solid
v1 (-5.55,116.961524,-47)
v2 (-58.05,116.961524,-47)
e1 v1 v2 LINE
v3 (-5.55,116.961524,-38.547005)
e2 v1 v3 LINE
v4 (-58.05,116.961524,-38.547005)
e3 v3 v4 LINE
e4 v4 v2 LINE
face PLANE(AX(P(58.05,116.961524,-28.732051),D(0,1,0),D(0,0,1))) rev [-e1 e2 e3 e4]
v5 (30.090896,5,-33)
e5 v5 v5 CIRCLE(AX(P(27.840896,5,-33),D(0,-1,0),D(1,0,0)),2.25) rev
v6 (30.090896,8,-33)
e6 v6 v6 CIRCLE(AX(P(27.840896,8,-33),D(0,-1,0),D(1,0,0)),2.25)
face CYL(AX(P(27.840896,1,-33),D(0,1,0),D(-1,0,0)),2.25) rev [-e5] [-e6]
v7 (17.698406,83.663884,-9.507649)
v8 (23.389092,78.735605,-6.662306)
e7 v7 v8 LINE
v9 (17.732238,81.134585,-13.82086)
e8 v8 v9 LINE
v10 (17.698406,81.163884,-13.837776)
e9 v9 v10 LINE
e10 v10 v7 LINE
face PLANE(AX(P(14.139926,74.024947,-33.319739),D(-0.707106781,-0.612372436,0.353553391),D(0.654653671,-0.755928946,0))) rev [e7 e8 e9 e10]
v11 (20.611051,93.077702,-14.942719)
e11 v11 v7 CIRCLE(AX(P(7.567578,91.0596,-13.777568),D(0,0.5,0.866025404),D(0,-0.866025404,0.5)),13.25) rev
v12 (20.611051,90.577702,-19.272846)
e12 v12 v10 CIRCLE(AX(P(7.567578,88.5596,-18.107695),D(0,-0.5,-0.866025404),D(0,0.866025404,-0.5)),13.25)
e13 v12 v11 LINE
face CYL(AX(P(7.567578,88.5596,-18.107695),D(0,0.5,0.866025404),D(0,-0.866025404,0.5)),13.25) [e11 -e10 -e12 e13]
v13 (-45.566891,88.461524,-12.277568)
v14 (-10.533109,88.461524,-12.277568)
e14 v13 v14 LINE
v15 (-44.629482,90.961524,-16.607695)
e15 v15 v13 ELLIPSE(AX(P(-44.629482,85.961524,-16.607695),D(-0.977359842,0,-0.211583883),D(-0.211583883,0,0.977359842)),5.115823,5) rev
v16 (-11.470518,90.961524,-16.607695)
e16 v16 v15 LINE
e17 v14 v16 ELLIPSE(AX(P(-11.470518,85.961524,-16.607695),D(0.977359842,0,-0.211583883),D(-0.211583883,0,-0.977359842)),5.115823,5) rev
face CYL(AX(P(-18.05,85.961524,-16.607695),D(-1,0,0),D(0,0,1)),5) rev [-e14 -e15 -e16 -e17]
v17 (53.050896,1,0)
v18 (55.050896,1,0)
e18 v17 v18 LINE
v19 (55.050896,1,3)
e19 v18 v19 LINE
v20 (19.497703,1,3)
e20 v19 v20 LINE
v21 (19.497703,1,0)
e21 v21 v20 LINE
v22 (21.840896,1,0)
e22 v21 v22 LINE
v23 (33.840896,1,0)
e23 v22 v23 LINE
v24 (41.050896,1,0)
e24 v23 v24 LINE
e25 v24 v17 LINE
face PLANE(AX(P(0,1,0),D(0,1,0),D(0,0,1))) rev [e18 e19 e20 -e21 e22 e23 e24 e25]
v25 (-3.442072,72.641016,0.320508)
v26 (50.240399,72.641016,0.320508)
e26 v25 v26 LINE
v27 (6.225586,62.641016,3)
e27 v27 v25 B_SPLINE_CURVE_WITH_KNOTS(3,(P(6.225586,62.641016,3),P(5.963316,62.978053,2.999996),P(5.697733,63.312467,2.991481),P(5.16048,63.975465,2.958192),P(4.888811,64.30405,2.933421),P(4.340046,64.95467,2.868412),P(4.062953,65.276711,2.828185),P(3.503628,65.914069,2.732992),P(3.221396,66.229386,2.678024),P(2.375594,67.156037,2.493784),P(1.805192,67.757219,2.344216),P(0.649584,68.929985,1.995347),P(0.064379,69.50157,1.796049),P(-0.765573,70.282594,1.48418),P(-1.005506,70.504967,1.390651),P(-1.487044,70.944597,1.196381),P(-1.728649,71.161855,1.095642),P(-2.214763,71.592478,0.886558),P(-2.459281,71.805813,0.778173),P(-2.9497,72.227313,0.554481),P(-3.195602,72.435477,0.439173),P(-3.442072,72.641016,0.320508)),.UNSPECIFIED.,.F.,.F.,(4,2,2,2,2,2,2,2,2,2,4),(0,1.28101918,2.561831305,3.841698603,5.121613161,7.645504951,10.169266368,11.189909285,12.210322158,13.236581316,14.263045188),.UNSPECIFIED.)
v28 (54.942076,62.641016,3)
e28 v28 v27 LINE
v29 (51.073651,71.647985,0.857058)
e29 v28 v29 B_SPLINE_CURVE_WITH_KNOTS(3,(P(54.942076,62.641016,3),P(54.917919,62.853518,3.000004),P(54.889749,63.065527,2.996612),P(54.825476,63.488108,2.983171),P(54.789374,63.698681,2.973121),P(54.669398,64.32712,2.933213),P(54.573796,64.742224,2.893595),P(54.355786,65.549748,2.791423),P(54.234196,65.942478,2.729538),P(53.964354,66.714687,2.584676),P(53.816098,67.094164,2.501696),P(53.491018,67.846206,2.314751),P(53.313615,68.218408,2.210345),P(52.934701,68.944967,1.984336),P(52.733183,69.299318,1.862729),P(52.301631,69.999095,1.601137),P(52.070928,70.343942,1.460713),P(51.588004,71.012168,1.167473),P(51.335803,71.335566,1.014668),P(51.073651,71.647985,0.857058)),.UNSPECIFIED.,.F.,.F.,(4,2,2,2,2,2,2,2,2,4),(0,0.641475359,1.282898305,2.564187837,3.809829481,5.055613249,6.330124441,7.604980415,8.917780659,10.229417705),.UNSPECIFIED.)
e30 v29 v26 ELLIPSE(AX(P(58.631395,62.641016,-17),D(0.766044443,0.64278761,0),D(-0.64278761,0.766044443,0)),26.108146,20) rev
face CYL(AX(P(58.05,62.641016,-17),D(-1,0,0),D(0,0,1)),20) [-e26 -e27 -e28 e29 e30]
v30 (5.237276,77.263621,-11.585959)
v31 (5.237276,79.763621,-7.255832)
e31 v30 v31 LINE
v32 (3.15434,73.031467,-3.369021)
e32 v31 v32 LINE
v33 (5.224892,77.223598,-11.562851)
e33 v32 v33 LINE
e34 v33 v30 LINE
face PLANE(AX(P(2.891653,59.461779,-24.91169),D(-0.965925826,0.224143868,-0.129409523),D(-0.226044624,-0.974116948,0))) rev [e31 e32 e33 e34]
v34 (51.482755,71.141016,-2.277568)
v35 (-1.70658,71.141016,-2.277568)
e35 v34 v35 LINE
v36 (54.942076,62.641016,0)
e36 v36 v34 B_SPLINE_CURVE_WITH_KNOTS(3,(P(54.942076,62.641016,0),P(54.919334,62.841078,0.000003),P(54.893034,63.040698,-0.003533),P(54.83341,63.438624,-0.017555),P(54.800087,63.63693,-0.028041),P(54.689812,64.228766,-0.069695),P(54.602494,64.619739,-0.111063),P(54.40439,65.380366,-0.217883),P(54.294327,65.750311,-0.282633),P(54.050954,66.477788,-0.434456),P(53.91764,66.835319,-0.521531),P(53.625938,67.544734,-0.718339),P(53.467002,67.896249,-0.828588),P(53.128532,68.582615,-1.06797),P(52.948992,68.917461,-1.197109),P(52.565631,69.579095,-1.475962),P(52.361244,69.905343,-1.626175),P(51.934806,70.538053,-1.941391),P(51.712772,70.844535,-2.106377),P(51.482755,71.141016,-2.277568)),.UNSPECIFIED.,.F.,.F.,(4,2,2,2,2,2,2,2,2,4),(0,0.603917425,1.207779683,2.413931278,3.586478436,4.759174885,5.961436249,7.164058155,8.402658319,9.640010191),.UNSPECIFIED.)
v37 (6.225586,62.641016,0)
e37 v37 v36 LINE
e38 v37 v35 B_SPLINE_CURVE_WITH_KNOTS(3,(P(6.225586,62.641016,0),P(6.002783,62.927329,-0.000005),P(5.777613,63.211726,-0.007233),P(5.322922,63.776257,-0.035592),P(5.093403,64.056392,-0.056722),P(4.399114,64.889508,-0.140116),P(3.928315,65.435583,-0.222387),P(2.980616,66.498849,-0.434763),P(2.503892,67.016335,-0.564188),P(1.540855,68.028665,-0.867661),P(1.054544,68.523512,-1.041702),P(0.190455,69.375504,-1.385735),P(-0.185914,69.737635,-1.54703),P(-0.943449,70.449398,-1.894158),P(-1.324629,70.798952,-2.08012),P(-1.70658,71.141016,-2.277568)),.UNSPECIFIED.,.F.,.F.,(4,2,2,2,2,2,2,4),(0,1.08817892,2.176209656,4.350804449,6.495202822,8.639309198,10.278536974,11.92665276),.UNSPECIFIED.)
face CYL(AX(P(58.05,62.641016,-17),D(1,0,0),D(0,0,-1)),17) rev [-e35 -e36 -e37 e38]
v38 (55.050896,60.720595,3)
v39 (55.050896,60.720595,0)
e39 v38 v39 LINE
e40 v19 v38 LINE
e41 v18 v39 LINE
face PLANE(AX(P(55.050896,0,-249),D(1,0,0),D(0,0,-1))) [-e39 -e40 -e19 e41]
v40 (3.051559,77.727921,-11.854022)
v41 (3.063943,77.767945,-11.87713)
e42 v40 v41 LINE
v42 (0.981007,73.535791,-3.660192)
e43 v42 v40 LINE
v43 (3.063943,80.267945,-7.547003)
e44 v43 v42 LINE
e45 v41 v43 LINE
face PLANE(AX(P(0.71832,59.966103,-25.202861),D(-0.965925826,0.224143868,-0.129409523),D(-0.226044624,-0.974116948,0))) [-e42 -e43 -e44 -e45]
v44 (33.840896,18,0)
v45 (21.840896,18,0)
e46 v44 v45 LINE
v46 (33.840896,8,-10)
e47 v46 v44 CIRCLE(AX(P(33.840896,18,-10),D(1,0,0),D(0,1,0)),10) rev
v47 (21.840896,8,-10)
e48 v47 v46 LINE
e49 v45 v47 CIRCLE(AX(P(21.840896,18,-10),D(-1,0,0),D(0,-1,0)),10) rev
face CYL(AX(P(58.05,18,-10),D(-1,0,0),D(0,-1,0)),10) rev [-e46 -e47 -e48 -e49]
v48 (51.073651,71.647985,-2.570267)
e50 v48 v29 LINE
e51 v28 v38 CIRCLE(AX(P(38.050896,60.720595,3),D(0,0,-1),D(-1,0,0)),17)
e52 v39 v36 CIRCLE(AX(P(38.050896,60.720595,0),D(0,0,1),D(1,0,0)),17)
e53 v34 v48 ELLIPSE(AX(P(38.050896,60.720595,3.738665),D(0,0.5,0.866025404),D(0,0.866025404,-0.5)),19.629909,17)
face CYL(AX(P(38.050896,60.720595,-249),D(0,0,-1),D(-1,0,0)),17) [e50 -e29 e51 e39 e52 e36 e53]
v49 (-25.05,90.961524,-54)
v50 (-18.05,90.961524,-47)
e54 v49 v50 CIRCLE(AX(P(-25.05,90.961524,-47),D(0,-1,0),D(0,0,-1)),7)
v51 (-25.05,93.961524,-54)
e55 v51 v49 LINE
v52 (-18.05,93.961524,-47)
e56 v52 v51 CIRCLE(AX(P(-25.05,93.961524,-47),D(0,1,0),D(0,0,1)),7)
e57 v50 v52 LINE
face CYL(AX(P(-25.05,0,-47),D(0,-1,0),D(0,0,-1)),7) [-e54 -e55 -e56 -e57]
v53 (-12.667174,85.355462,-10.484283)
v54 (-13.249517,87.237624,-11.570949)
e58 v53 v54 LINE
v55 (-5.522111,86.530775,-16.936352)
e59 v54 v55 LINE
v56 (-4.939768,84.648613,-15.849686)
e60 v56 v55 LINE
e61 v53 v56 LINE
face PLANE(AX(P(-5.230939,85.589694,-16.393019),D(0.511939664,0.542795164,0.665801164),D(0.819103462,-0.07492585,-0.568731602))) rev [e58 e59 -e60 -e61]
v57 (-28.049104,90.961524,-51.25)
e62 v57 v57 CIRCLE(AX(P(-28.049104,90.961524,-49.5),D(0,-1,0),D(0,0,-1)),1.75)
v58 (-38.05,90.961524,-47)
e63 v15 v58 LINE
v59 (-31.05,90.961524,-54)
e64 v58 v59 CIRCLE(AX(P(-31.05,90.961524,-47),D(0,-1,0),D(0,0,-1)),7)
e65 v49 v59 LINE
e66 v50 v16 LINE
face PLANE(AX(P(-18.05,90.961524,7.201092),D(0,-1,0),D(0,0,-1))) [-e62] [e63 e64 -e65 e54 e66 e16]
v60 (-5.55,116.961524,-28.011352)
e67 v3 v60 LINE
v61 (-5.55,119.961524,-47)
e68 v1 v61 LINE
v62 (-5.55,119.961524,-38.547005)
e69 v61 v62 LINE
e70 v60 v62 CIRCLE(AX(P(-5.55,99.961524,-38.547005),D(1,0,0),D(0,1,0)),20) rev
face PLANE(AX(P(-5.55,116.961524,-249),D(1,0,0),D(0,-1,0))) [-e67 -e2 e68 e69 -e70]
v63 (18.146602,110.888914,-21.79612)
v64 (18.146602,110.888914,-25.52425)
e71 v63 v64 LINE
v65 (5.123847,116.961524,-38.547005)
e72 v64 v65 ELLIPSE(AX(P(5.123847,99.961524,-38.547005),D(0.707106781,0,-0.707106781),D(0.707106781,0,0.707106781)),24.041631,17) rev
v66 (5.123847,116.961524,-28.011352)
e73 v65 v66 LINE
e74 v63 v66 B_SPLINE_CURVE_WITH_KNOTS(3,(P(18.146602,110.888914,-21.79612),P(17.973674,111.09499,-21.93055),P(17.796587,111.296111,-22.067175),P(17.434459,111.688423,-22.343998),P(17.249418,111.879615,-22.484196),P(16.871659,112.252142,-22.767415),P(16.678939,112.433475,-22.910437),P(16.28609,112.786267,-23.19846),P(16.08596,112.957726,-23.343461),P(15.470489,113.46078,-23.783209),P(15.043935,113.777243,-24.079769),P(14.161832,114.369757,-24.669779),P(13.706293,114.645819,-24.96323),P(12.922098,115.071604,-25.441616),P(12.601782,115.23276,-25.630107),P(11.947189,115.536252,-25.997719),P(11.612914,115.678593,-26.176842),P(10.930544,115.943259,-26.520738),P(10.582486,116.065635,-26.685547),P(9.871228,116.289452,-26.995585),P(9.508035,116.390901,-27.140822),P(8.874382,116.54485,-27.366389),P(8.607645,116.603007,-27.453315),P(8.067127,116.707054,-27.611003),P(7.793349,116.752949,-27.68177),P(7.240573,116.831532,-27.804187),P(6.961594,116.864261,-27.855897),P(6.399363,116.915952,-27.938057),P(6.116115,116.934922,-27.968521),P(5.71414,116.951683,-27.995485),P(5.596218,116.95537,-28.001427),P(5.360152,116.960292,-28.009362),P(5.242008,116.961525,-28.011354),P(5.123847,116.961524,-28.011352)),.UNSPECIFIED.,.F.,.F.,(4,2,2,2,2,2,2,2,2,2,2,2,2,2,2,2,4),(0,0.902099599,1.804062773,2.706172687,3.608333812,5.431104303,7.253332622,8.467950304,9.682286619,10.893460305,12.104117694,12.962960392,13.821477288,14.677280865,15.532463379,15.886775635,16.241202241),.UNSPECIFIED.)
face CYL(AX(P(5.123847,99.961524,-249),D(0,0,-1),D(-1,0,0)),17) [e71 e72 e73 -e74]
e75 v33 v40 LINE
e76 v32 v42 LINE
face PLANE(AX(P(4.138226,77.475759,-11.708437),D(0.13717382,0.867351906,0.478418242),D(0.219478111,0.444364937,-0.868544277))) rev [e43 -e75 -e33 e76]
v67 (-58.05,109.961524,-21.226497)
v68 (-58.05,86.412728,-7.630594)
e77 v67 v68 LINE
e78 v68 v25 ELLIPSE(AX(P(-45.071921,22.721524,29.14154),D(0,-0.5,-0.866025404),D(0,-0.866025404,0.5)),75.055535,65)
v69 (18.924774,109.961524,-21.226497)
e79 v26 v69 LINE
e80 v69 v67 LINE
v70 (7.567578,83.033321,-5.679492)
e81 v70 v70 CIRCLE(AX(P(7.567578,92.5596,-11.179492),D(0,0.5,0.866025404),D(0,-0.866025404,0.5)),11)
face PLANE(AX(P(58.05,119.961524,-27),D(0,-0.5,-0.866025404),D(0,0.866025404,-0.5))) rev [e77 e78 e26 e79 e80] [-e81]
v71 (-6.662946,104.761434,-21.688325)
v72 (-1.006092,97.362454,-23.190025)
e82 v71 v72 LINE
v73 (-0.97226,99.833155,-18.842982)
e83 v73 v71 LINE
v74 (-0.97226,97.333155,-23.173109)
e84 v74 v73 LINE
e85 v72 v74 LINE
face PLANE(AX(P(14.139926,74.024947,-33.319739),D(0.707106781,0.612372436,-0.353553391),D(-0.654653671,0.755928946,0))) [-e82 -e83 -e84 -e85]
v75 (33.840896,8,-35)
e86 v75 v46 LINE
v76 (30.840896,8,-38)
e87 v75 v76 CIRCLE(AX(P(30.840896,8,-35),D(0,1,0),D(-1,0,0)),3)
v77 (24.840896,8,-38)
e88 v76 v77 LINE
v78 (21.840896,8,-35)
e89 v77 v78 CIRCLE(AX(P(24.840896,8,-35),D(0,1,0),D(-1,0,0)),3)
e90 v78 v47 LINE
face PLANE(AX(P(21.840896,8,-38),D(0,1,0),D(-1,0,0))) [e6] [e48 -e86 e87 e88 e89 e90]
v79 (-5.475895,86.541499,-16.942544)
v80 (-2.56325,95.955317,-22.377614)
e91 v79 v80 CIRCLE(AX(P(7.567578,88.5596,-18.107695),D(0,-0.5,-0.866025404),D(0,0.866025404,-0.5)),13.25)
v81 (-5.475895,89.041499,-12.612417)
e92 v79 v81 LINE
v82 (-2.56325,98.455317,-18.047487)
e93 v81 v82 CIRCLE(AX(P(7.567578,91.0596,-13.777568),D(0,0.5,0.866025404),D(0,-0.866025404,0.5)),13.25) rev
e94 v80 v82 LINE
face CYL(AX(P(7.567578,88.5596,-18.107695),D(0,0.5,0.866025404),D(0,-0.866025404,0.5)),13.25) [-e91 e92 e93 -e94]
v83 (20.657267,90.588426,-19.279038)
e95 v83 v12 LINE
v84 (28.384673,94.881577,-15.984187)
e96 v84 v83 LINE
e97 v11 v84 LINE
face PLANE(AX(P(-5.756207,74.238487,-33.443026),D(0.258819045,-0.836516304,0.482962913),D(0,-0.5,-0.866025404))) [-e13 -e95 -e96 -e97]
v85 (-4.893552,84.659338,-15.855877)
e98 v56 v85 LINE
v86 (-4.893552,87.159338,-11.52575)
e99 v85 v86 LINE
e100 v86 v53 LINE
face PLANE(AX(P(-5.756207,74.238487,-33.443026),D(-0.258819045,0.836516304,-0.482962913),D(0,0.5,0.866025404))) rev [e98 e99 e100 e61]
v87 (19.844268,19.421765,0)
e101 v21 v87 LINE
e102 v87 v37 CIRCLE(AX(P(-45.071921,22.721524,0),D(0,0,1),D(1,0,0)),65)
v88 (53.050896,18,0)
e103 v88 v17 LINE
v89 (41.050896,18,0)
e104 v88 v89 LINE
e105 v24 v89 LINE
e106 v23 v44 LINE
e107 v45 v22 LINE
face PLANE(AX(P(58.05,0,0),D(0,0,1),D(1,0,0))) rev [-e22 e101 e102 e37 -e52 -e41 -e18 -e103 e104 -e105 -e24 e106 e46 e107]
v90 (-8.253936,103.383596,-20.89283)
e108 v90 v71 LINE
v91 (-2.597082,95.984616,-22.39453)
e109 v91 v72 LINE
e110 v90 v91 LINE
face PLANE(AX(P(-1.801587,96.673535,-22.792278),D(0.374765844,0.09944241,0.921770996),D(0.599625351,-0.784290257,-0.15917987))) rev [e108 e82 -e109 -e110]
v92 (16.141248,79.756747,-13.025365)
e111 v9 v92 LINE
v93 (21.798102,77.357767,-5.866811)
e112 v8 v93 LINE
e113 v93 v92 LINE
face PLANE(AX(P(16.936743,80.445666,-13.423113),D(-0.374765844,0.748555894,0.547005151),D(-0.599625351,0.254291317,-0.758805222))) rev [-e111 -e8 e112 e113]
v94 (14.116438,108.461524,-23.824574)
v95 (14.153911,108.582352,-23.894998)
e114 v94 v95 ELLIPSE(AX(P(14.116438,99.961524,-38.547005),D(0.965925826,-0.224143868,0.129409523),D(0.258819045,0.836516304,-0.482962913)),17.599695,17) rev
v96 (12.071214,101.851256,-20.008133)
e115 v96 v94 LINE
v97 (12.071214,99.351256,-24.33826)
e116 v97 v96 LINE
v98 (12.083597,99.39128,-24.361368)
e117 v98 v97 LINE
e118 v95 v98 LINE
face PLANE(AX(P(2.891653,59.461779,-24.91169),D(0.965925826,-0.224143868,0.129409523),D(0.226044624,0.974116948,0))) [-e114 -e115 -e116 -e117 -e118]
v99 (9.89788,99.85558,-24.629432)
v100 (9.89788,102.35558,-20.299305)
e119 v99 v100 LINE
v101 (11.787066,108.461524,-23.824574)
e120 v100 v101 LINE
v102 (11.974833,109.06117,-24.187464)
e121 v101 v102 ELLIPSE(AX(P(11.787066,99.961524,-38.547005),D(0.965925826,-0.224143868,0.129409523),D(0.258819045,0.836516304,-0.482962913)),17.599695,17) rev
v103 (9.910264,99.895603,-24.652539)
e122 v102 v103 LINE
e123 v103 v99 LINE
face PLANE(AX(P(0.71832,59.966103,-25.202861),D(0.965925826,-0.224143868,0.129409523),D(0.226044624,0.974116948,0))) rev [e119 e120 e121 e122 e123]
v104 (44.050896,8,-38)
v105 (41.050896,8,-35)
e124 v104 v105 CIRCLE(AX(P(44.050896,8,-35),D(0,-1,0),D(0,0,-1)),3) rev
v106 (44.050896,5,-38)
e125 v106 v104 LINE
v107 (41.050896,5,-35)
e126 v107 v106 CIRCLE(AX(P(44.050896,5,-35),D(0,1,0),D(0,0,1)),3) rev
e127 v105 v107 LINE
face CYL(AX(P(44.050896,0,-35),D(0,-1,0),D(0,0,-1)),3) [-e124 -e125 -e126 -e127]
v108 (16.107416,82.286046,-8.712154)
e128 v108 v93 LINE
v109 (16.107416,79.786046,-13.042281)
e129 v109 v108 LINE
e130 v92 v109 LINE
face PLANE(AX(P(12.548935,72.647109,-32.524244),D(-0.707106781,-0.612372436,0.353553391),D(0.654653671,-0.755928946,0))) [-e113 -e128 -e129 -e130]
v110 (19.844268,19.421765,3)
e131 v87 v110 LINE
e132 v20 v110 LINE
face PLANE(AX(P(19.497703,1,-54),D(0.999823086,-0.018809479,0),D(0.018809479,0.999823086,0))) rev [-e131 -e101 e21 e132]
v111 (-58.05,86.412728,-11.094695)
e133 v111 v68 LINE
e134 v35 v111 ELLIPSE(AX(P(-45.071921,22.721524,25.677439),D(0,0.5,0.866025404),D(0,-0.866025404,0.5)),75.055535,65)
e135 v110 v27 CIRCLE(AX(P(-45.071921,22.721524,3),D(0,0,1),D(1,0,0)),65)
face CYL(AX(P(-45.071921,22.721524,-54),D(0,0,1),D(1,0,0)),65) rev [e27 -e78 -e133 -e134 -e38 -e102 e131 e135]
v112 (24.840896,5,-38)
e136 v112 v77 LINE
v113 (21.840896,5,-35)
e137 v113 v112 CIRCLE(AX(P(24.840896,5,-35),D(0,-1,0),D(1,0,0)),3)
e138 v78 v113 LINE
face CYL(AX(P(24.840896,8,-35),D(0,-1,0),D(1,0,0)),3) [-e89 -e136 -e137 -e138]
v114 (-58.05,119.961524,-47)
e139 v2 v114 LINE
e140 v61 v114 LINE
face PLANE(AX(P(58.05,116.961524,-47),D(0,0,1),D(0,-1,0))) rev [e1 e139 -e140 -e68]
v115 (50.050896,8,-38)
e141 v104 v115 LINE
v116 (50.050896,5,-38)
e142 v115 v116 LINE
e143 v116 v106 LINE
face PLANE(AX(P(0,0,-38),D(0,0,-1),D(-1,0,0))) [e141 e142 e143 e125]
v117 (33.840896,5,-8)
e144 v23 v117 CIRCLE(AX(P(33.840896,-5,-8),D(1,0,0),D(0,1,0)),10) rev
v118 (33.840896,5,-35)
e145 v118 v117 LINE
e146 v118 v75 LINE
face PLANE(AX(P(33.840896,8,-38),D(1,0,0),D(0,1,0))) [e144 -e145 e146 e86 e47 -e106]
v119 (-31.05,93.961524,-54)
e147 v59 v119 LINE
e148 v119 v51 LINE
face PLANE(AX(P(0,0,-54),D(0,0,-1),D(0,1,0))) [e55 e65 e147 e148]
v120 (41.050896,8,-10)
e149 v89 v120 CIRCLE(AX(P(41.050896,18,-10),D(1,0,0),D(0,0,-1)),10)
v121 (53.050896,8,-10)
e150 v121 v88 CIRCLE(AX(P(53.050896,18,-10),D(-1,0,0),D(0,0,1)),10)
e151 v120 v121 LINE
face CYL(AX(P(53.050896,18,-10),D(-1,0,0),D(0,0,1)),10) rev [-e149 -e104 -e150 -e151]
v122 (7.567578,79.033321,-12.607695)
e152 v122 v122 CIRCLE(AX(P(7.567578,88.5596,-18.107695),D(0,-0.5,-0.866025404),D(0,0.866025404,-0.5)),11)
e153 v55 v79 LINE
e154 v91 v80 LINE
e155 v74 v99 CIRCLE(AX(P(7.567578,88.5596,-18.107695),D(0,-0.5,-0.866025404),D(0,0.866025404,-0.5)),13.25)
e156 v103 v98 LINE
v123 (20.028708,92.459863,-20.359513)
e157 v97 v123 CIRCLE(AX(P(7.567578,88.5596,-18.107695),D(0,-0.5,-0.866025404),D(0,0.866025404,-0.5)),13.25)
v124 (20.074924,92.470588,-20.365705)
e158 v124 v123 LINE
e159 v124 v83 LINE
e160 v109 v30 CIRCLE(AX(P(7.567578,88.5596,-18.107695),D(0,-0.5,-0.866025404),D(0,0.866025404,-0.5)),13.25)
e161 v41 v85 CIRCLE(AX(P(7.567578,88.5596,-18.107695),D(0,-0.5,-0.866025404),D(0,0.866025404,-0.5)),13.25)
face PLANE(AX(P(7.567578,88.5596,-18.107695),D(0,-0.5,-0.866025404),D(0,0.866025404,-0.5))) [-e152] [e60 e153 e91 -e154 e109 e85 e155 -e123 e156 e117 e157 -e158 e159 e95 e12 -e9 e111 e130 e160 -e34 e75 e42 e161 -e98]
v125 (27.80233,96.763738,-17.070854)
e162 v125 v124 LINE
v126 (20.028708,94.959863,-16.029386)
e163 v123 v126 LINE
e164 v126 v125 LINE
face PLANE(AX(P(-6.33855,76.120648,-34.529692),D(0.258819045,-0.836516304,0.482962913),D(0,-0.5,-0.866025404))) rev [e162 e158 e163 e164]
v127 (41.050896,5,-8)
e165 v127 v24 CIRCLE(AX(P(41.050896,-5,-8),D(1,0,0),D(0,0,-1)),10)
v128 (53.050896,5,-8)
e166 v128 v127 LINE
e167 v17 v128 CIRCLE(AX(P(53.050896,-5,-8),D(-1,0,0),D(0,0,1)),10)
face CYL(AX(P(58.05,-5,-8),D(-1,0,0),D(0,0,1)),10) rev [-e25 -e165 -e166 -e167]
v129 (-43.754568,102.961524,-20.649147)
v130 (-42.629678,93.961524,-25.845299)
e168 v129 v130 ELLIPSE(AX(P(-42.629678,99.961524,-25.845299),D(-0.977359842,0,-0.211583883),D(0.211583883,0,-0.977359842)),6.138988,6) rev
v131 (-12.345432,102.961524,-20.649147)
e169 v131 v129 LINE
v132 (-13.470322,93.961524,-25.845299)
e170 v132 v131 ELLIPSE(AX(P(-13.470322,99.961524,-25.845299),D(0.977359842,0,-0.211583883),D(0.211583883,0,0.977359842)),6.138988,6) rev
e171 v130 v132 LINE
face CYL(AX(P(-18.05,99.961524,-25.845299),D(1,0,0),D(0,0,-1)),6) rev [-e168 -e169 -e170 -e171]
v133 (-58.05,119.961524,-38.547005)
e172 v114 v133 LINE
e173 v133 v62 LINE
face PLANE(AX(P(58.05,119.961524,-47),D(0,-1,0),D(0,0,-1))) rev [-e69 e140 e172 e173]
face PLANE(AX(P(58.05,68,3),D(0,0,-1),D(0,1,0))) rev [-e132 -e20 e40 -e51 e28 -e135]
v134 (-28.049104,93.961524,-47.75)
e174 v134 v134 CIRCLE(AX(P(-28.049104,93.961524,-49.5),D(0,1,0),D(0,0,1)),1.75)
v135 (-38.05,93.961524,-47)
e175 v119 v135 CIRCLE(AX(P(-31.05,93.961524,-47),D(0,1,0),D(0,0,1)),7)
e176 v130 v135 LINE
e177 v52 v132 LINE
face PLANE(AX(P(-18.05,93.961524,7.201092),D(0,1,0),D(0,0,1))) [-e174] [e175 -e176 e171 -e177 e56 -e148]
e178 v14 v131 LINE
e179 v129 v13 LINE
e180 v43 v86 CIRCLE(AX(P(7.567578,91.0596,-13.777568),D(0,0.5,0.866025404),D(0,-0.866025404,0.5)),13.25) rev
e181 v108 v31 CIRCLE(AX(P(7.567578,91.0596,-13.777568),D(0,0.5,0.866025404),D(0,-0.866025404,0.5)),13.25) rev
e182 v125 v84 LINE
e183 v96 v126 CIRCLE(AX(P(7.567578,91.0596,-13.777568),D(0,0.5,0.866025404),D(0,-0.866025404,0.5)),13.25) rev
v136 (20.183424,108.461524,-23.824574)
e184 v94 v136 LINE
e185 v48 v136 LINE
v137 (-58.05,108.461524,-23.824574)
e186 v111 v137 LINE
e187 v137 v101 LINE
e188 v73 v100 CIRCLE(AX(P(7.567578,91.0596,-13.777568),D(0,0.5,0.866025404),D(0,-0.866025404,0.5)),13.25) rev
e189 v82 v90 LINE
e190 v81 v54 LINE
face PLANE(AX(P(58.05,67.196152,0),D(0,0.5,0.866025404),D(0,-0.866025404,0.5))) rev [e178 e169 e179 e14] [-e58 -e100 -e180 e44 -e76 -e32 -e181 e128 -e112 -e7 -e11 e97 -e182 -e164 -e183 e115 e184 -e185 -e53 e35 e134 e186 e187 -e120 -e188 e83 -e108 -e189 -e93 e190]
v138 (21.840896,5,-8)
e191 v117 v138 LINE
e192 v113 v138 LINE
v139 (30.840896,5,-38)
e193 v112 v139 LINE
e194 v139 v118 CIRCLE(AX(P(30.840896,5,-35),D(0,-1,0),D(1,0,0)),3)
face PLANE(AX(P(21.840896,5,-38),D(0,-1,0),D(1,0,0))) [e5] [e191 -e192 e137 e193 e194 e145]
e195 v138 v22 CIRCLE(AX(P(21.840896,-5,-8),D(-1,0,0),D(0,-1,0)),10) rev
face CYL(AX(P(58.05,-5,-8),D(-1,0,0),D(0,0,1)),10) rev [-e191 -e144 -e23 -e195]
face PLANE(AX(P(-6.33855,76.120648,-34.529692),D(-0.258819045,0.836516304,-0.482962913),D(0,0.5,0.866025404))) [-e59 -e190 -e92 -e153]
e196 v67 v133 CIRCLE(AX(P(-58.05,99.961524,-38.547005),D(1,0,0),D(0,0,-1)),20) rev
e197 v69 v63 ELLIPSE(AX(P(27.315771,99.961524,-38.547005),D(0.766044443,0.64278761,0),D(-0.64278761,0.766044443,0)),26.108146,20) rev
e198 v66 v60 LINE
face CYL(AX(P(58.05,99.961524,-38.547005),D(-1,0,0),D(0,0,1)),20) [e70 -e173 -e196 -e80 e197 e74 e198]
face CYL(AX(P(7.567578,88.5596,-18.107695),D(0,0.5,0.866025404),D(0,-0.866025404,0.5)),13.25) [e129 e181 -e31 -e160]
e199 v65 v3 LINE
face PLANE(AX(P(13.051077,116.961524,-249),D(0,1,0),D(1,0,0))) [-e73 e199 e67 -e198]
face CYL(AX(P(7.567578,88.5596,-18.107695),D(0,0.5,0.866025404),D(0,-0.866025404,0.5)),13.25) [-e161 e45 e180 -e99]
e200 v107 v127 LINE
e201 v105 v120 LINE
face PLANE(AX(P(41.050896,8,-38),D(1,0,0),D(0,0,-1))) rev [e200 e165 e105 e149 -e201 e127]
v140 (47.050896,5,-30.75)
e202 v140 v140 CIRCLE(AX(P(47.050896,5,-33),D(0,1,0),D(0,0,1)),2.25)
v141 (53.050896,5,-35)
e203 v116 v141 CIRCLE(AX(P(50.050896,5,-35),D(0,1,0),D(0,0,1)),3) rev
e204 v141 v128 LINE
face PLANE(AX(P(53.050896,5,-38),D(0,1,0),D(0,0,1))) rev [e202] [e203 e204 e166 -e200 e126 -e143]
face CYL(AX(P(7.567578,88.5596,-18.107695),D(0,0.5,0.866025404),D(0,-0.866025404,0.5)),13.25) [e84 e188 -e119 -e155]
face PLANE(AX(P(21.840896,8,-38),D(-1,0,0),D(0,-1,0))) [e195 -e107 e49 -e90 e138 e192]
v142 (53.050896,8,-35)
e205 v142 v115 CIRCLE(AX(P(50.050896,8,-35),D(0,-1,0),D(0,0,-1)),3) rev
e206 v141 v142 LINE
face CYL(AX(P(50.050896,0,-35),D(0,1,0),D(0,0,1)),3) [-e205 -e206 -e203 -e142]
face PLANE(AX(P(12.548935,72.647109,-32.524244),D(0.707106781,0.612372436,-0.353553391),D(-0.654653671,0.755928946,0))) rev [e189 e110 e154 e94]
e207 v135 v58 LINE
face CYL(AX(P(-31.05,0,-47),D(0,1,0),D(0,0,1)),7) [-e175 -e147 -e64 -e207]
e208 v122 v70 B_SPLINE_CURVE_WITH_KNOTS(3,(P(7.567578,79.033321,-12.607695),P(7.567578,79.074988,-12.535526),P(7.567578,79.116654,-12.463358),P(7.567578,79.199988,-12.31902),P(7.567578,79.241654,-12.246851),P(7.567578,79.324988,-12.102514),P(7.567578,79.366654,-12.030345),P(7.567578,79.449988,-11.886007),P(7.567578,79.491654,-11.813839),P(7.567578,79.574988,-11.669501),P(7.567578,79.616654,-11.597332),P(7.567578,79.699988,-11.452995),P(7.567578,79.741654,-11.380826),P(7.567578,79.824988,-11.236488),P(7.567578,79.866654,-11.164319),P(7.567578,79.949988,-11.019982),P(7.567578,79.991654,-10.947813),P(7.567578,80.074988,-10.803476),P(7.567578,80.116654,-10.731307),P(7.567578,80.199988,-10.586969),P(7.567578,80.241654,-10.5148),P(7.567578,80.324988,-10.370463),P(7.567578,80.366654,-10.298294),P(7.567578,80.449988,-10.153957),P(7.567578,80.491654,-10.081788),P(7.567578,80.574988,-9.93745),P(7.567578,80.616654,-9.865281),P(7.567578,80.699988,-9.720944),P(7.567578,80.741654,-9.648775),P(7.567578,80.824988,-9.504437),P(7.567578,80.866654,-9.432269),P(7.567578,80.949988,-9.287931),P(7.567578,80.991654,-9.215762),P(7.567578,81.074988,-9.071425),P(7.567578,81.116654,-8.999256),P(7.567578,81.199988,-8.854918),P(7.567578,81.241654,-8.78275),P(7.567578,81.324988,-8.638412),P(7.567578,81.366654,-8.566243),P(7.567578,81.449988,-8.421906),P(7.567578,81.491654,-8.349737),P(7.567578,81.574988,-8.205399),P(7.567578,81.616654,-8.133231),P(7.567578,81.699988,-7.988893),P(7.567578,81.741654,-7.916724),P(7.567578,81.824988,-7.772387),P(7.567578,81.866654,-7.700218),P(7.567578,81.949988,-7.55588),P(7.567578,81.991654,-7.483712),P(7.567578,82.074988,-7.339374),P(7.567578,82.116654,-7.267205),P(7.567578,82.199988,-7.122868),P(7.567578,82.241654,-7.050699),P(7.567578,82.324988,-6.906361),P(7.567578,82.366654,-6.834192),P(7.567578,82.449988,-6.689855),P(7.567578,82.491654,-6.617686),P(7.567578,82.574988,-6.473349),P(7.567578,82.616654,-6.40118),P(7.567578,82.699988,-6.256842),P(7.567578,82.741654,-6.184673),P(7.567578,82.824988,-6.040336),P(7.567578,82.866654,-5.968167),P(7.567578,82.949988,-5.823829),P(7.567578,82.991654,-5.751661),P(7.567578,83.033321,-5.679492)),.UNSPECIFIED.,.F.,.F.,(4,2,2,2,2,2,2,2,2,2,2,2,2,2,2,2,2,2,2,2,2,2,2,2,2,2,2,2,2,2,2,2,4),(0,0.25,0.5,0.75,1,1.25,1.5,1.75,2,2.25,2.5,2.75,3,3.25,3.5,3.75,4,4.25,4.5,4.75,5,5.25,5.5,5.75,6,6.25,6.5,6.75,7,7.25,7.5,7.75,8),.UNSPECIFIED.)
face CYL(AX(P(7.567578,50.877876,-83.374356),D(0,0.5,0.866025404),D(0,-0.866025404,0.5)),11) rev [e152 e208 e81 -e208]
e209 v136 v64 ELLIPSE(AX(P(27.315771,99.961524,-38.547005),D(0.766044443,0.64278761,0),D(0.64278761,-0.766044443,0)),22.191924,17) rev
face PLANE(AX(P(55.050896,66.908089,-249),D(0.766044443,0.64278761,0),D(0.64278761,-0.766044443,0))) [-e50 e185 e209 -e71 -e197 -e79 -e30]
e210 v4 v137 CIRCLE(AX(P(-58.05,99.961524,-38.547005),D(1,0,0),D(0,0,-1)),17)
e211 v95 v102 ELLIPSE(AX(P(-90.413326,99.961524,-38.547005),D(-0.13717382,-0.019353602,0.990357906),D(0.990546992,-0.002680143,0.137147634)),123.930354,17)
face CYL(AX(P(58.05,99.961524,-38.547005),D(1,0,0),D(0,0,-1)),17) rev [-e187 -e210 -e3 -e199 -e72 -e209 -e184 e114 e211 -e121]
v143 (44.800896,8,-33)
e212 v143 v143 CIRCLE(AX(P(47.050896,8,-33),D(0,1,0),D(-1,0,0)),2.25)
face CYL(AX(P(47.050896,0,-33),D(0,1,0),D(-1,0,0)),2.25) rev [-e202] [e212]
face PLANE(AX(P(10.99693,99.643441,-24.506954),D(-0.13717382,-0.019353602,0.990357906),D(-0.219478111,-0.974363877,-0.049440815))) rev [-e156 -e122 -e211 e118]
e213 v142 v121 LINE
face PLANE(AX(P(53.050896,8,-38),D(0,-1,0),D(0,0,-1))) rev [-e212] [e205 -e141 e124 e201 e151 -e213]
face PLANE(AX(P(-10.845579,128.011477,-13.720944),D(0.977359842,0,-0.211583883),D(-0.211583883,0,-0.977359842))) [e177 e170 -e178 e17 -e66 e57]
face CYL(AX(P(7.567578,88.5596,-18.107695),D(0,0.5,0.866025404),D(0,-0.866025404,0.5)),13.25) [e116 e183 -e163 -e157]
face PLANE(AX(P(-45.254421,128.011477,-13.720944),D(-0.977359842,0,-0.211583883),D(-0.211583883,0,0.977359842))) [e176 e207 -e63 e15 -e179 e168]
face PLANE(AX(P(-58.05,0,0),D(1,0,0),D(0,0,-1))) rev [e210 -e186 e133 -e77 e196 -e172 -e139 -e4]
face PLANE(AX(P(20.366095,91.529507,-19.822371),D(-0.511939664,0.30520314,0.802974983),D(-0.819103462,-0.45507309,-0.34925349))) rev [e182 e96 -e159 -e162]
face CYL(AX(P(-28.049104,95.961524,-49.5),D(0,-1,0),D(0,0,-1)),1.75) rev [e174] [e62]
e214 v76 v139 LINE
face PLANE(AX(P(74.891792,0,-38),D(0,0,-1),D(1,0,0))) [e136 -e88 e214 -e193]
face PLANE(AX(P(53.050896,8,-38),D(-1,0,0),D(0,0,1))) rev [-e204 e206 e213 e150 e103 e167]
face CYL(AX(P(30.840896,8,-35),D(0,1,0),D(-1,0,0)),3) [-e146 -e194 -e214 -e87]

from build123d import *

# Parameters (mm, degrees)
SALIENTE_EXTRUIR1_DEPTH  = 58.05
REDONDEO1_R              = 20
REDONDEO2_R              = 20
REDONDEO3_R              = 17
REDONDEO4_R              = 17
CAVIDAD1_START           = -47
CAVIDAD1_DEPTH           = 51
CROQUIS8_W               = 12
CROQUIS8_H               = 3
SALIENTE_EXTRUIR2_DEPTH  = 38
CROQUIS9_R               = 2.25
CORTAR_EXTRUIR6_DEPTH    = 135.588949923
SALIENTE_EXTRUIR3_REACH  = 146.947
CROQUIS11_W              = 20
CROQUIS11_H              = 3
CROQUIS12_W              = 69.238292886
CROQUIS12_H              = 3
CORTAR_EXTRUIR7_DEPTH    = 1
CROQUIS15_R              = 1.75
CORTAR_EXTRUIR10_DEPTH   = 5
REDONDEO5_R              = 7
REDONDEO6_R              = 3
CROQUIS18_R              = 11
CORTAR_EXTRUIR12_DEPTH   = 146.081609054
CROQUIS19_R              = 13.25
CROQUIS19_R_2            = 11
SALIENTE_EXTRUIR4_DEPTH  = 5
CROQUIS16_R              = 65
CORTAR_EXTRUIR11_DEPTH   = 145.946782753
SALIENTE_EXTRUIR5_DEPTH  = 3
NERVIO8_START            = -1.125
NERVIO8_DEPTH            = 2.25
MATRIZC2_COUNT           = 6
REDONDEO6_OF_SIMETR_A1_R = 3
REDONDEO7_R              = 10
REDONDEO8_R              = 10
REDONDEO9_R              = 6
CORTAR_EXTRUIR14_DEPTH   = 145.946782753
REDONDEO10_R             = 5


with BuildPart() as part:
    # Croquis1 → Saliente-Extruir1 (new, symmetric)
    with BuildSketch(Plane(origin=(0, 0, 0), x_dir=(0, 0, -1), z_dir=(1, 0, 0))):
        Polygon((0, 0), (0, 67.196152423), (28.732050808, 116.961524227), (47, 116.961524227), (47, 119.961524227), (27, 119.961524227), (-3, 68), (-3, 0), align=None)
    extrude(amount=SALIENTE_EXTRUIR1_DEPTH, both=True)

    # Redondeo1
    redondeo1_edges = [part.edges().sort_by_distance(p)[0] for p in [
        (0, 68, 3),
    ]]
    fillet(redondeo1_edges, radius=REDONDEO1_R)

    # Redondeo2
    redondeo2_edges = [part.edges().sort_by_distance(p)[0] for p in [
        (0, 119.961524227, -27),
    ]]
    fillet(redondeo2_edges, radius=REDONDEO2_R)

    # Redondeo3
    redondeo3_edges = [part.edges().sort_by_distance(p)[0] for p in [
        (0, 116.961524227, -28.732050808),
    ]]
    fillet(redondeo3_edges, radius=REDONDEO3_R)

    # Redondeo4
    redondeo4_edges = [part.edges().sort_by_distance(p)[0] for p in [
        (0, 67.196152423, 0),
    ]]
    fillet(redondeo4_edges, radius=REDONDEO4_R)

    # Cavidad1: read off the stored shape, not the designer's step
    # Cavidad1 outline → Cavidad1 (cut)
    with BuildSketch(Plane.XY.offset(CAVIDAD1_START)):
        with BuildLine():
            Line((58.05, 0), (58.05, 119.961524227))
            Line((58.05, 119.961524227), (-5.55, 119.961524227))
            Line((-5.55, 119.961524227), (-5.55, 116.961524227))
            Line((-5.55, 116.961524227), (5.123846837, 116.961524227))
            ThreePointArc((5.123846837, 116.961524227), (12.308357287, 115.368756607), (18.14660237, 110.888913592))
            Line((18.14660237, 110.888913592), (51.073651347, 71.647984679))
            ThreePointArc((51.073651347, 71.647984679), (54.025670368, 66.534937751), (55.050895814, 60.720595315))
            Line((55.050895814, 60.720595315), (55.050895814, 0))
            Line((55.050895814, 0), (58.05, 0))
        make_face()
    extrude(amount=CAVIDAD1_DEPTH, mode=Mode.SUBTRACT)

    # Croquis8 → Saliente-Extruir2 (add)
    with BuildSketch(Plane(origin=(0, 0, 0), x_dir=(-1, 0, 0), z_dir=(0, 0, -1))):
        with Locations((-47.050895814, 6.5)):
            Rectangle(CROQUIS8_W, CROQUIS8_H)
    saliente_extruir2 = extrude(amount=SALIENTE_EXTRUIR2_DEPTH)

    # Croquis9 → Cortar-Extruir6 (cut, through all)
    with BuildSketch(Plane(origin=(0, 8, 0), x_dir=(1, 0, 0), z_dir=(0, 1, 0))):
        with Locations(Location((47.050895814, 33, 0), (0, 0, 180))):
            Circle(CROQUIS9_R)
    cortar_extruir6 = extrude(amount=-CORTAR_EXTRUIR6_DEPTH, mode=Mode.SUBTRACT)

    # Saliente-Extruir3: up to this plane
    saliente_extruir3_end = Plane(origin=(58.05, 67.196152423, 0), z_dir=(0, 0.49999999999999767, 0.86602540378444))
    # Croquis11 → Saliente-Extruir3 (add, up to the surface)
    with BuildSketch(Plane(origin=(0, 0, -54), x_dir=(-1, 0, 0), z_dir=(0, 0, -1)), mode=Mode.PRIVATE) as saliente_extruir3_sk1:
        with Locations((28.05, 92.461524227)):
            Rectangle(CROQUIS11_W, CROQUIS11_H)
    saliente_extruir3_tool1 = split(extrude(saliente_extruir3_sk1.sketch, amount=-SALIENTE_EXTRUIR3_REACH, mode=Mode.PRIVATE), bisect_by=saliente_extruir3_end, keep=Keep.BOTH, mode=Mode.PRIVATE)
    add(saliente_extruir3_tool1.solids().sort_by_distance((-28.05, 92.461524, -54))[0])

    # Croquis12 → Cortar-Extruir7 (cut)
    with BuildSketch(Plane.XZ):
        with Locations((20.431749371, 1.5)):
            Rectangle(CROQUIS12_W, CROQUIS12_H)
    extrude(amount=-CORTAR_EXTRUIR7_DEPTH, mode=Mode.SUBTRACT)

    # Croquis15 → Cortar-Extruir10 (cut)
    with BuildSketch(Plane.XZ.offset(-90.961524227)):
        with Locations(Location((-28.049104186, -49.5, 0), (0, 0, 270))):
            Circle(CROQUIS15_R)
    extrude(amount=-CORTAR_EXTRUIR10_DEPTH, mode=Mode.SUBTRACT)

    # Redondeo5
    redondeo5_edges = [part.edges().sort_by_distance(p)[0] for p in [
        (-18.05, 92.461524227, -54),
        (-38.05, 92.461524227, -54),
    ]]
    fillet(redondeo5_edges, radius=REDONDEO5_R)

    # Redondeo6
    redondeo6_edges = [part.edges().sort_by_distance(p)[0] for p in [
        (53.050895814, 6.5, -38),
        (41.050895814, 6.5, -38),
    ]]
    fillet(redondeo6_edges, radius=REDONDEO6_R)

    # Croquis18 → Cortar-Extruir12 (cut, through all)
    with BuildSketch(Plane(origin=(0, 18.299038106, 31.694863729), x_dir=(1, 0, 0), z_dir=(0, 0.4999999999999976, 0.86602540378444))):
        with Locations(Location((7.567578046, 85.748711306, 0), (0, 0, 270))):
            Circle(CROQUIS18_R)
    extrude(amount=-CORTAR_EXTRUIR12_DEPTH, mode=Mode.SUBTRACT)

    # Croquis19 → Saliente-Extruir4 (add)
    with BuildSketch(Plane(origin=(0, 16.799038106, 29.096787517), x_dir=(-1, 0, 0), z_dir=(0, -0.4999999999999977, -0.8660254037844399))):
        with Locations(Location((-7.567578046, 85.748711306, 0), (0, 0, 270))):
            Circle(CROQUIS19_R)
        with Locations(Location((-7.567578046, 85.748711306, 0), (0, 0, 270))):
            Circle(CROQUIS19_R_2, mode=Mode.SUBTRACT)
    extrude(amount=SALIENTE_EXTRUIR4_DEPTH)

    # Croquis16 → Cortar-Extruir11 (cut, through all)
    with BuildSketch(Plane.XY.offset(3)):
        with Locations((-45.071920691, 22.721524227)):
            Circle(CROQUIS16_R)
    extrude(amount=-CORTAR_EXTRUIR11_DEPTH, mode=Mode.SUBTRACT)

    # Croquis25 → Saliente-Extruir5 (add)
    with BuildSketch(Plane.XZ.offset(-90.961524227)):
        Polygon((-38.05, -13.720943809), (-45.254421175, -13.720943809), (-38.05, -47), align=None)
        Polygon((-10.845578825, -13.720943809), (-18.05, -47), (-18.05, -13.720943809), align=None)
    extrude(amount=-SALIENTE_EXTRUIR5_DEPTH)

    # Nervio8: read off the stored shape, not the designer's step
    # Nervio8 outline → Nervio8 (add)
    with BuildSketch(Plane(origin=(46.658144676, 40.407138583, -23.329072338), x_dir=(-0.707106781186543, 0.6123724356957992, -0.35355339059327456), z_dir=(-0.7071067811865521, -0.6123724356957916, 0.35355339059326985)).offset(NERVIO8_START)):
        Polygon((42.080255309, -28.598076211), (42.032409489, -28.598076211), (34.032409489, -33.598076211), (42.080255309, -33.598076211), align=None)
    nervio8 = extrude(amount=NERVIO8_DEPTH)

    # MatrizC2: Nervio8 ×6 about axis
    matrizc2_axis = Axis((7.567578046, 74.260562333, -42.874355653), (0, -0.49999999999999767, -0.86602540378444))
    for i in range(1, MATRIZC2_COUNT):
        add(nervio8.rotate(matrizc2_axis, i * 360 / MATRIZC2_COUNT))

    # Simetría1: Saliente-Extruir2, Cortar-Extruir6 across plane
    add(saliente_extruir2.mirror(Plane(origin=(37.445895814, 0, 0), x_dir=(0, 0, 1), z_dir=(1, 0, 0))))
    add(cortar_extruir6.mirror(Plane(origin=(37.445895814, 0, 0), x_dir=(0, 0, 1), z_dir=(1, 0, 0))), mode=Mode.SUBTRACT)

    # Redondeo6 of Simetría1
    redondeo6_of_simetr_a1_edges = [part.edges().sort_by_distance(p)[0] for p in [
        (21.840895814, 6.5, -38),
        (33.840895814, 6.5, -38),
    ]]
    fillet(redondeo6_of_simetr_a1_edges, radius=REDONDEO6_OF_SIMETR_A1_R)

    # Redondeo7
    # the kernel refuses this fillet: 10 mm, written as the material it adds along each edge
    with BuildSketch(Plane(origin=(21.050895814, 5, 0), x_dir=(0, -1, 0), z_dir=(1, 0, 0))) as redondeo7_piece_1_section:
        with BuildLine():
            CenterArc((10, 8), REDONDEO7_R, 180, 53.130102354)
            Line((0, 8), (-0.2, 8))
            Line((-0.2, 8), (-0.2, 0))
            Line((-0.2, 0), (0, -0.2))
            ThreePointArc((0, -0.2), (2, -0.2), (3.88, -0.16))
            Line((3.88, -0.16), (4, 0))
        make_face()
    redondeo7_piece_1 = extrude(amount=32, mode=Mode.PRIVATE)
    redondeo7_piece_1 = split(redondeo7_piece_1, bisect_by=Plane(origin=(21.840895814, 5, 0), z_dir=(1, 0, 0)), keep=Keep.TOP, mode=Mode.PRIVATE)
    redondeo7_piece_1 = split(redondeo7_piece_1, bisect_by=Plane(origin=(33.840895814, 5, 0), z_dir=(-1, 0, 0)), keep=Keep.TOP, mode=Mode.PRIVATE)
    add(redondeo7_piece_1)
    with BuildSketch(Plane(origin=(41.050895814, 5, 0), x_dir=(0, -1, 0), z_dir=(1, 0, 0))) as redondeo7_piece_2:
        with BuildLine():
            CenterArc((10, 8), REDONDEO7_R, 180, 53.130102354)
            Line((0, 8), (-0.2, 8))
            Line((-0.2, 8), (-0.2, 0))
            Line((-0.2, 0), (0, -0.2))
            ThreePointArc((0, -0.2), (2, -0.2), (3.88, -0.16))
            Line((3.88, -0.16), (4, 0))
        make_face()
    extrude(amount=12)
    with BuildSketch(Plane(origin=(53.840895814, 5, 0), x_dir=(0, -1, 0), z_dir=(-1, 0, 0))) as redondeo7_piece_3_section:
        with BuildLine():
            CenterArc((10, -8), REDONDEO7_R, 126.869897646, 53.130102354)
            Line((0, -8), (-0.2, -8))
            Line((-0.2, -8), (-0.2, 0))
            Line((-0.2, 0), (0, 0.2))
            ThreePointArc((0, 0.2), (2, 0.2), (3.88, 0.16))
            Line((3.88, 0.16), (4, 0))
        make_face()
    redondeo7_piece_3 = extrude(amount=32, mode=Mode.PRIVATE)
    redondeo7_piece_3 = split(redondeo7_piece_3, bisect_by=Plane(origin=(53.050895814, 5, 0), z_dir=(-1, 0, 0)), keep=Keep.TOP, mode=Mode.PRIVATE)
    redondeo7_piece_3 = split(redondeo7_piece_3, bisect_by=Plane(origin=(41.050895814, 5, 0), z_dir=(1, 0, 0)), keep=Keep.TOP, mode=Mode.PRIVATE)
    add(redondeo7_piece_3)
    with BuildSketch(Plane(origin=(33.840895814, 5, 0), x_dir=(0, -1, 0), z_dir=(-1, 0, 0))) as redondeo7_piece_4:
        with BuildLine():
            CenterArc((10, -8), REDONDEO7_R, 126.869897646, 53.130102354)
            Line((0, -8), (-0.2, -8))
            Line((-0.2, -8), (-0.2, 0))
            Line((-0.2, 0), (0, 0.2))
            ThreePointArc((0, 0.2), (2, 0.2), (3.88, 0.16))
            Line((3.88, 0.16), (4, 0))
        make_face()
    extrude(amount=12)

    # Redondeo8
    redondeo8_edges = [part.edges().sort_by_distance(p)[0] for p in [
        (47.050895814, 8, 0),
        (27.840895814, 8, 0),
    ]]
    fillet(redondeo8_edges, radius=REDONDEO8_R)

    # Redondeo9
    redondeo9_edges = [part.edges().sort_by_distance(p)[0] for p in [
        (-28.05, 93.961524227, -15.452994616),
    ]]
    fillet(redondeo9_edges, radius=REDONDEO9_R)

    # Croquis31 → Cortar-Extruir14 (cut, through all)
    with BuildSketch(Plane.XY.offset(3)):
        with BuildLine():
            Line((16.191244305, 1), (19.497703143, 1))
            Line((19.497703143, 1), (19.844268253, 19.421764692))
            ThreePointArc((19.844268253, 19.421764692), (18.686590065, 10.078253042), (16.191244305, 1))
        make_face()
    extrude(amount=-CORTAR_EXTRUIR14_DEPTH, mode=Mode.SUBTRACT)

    # Redondeo10
    redondeo10_edges = [part.edges().sort_by_distance(p)[0] for p in [
        (-28.05, 90.961524227, -13.720943809),
    ]]
    fillet(redondeo10_edges, radius=REDONDEO10_R)


solid = part.part
